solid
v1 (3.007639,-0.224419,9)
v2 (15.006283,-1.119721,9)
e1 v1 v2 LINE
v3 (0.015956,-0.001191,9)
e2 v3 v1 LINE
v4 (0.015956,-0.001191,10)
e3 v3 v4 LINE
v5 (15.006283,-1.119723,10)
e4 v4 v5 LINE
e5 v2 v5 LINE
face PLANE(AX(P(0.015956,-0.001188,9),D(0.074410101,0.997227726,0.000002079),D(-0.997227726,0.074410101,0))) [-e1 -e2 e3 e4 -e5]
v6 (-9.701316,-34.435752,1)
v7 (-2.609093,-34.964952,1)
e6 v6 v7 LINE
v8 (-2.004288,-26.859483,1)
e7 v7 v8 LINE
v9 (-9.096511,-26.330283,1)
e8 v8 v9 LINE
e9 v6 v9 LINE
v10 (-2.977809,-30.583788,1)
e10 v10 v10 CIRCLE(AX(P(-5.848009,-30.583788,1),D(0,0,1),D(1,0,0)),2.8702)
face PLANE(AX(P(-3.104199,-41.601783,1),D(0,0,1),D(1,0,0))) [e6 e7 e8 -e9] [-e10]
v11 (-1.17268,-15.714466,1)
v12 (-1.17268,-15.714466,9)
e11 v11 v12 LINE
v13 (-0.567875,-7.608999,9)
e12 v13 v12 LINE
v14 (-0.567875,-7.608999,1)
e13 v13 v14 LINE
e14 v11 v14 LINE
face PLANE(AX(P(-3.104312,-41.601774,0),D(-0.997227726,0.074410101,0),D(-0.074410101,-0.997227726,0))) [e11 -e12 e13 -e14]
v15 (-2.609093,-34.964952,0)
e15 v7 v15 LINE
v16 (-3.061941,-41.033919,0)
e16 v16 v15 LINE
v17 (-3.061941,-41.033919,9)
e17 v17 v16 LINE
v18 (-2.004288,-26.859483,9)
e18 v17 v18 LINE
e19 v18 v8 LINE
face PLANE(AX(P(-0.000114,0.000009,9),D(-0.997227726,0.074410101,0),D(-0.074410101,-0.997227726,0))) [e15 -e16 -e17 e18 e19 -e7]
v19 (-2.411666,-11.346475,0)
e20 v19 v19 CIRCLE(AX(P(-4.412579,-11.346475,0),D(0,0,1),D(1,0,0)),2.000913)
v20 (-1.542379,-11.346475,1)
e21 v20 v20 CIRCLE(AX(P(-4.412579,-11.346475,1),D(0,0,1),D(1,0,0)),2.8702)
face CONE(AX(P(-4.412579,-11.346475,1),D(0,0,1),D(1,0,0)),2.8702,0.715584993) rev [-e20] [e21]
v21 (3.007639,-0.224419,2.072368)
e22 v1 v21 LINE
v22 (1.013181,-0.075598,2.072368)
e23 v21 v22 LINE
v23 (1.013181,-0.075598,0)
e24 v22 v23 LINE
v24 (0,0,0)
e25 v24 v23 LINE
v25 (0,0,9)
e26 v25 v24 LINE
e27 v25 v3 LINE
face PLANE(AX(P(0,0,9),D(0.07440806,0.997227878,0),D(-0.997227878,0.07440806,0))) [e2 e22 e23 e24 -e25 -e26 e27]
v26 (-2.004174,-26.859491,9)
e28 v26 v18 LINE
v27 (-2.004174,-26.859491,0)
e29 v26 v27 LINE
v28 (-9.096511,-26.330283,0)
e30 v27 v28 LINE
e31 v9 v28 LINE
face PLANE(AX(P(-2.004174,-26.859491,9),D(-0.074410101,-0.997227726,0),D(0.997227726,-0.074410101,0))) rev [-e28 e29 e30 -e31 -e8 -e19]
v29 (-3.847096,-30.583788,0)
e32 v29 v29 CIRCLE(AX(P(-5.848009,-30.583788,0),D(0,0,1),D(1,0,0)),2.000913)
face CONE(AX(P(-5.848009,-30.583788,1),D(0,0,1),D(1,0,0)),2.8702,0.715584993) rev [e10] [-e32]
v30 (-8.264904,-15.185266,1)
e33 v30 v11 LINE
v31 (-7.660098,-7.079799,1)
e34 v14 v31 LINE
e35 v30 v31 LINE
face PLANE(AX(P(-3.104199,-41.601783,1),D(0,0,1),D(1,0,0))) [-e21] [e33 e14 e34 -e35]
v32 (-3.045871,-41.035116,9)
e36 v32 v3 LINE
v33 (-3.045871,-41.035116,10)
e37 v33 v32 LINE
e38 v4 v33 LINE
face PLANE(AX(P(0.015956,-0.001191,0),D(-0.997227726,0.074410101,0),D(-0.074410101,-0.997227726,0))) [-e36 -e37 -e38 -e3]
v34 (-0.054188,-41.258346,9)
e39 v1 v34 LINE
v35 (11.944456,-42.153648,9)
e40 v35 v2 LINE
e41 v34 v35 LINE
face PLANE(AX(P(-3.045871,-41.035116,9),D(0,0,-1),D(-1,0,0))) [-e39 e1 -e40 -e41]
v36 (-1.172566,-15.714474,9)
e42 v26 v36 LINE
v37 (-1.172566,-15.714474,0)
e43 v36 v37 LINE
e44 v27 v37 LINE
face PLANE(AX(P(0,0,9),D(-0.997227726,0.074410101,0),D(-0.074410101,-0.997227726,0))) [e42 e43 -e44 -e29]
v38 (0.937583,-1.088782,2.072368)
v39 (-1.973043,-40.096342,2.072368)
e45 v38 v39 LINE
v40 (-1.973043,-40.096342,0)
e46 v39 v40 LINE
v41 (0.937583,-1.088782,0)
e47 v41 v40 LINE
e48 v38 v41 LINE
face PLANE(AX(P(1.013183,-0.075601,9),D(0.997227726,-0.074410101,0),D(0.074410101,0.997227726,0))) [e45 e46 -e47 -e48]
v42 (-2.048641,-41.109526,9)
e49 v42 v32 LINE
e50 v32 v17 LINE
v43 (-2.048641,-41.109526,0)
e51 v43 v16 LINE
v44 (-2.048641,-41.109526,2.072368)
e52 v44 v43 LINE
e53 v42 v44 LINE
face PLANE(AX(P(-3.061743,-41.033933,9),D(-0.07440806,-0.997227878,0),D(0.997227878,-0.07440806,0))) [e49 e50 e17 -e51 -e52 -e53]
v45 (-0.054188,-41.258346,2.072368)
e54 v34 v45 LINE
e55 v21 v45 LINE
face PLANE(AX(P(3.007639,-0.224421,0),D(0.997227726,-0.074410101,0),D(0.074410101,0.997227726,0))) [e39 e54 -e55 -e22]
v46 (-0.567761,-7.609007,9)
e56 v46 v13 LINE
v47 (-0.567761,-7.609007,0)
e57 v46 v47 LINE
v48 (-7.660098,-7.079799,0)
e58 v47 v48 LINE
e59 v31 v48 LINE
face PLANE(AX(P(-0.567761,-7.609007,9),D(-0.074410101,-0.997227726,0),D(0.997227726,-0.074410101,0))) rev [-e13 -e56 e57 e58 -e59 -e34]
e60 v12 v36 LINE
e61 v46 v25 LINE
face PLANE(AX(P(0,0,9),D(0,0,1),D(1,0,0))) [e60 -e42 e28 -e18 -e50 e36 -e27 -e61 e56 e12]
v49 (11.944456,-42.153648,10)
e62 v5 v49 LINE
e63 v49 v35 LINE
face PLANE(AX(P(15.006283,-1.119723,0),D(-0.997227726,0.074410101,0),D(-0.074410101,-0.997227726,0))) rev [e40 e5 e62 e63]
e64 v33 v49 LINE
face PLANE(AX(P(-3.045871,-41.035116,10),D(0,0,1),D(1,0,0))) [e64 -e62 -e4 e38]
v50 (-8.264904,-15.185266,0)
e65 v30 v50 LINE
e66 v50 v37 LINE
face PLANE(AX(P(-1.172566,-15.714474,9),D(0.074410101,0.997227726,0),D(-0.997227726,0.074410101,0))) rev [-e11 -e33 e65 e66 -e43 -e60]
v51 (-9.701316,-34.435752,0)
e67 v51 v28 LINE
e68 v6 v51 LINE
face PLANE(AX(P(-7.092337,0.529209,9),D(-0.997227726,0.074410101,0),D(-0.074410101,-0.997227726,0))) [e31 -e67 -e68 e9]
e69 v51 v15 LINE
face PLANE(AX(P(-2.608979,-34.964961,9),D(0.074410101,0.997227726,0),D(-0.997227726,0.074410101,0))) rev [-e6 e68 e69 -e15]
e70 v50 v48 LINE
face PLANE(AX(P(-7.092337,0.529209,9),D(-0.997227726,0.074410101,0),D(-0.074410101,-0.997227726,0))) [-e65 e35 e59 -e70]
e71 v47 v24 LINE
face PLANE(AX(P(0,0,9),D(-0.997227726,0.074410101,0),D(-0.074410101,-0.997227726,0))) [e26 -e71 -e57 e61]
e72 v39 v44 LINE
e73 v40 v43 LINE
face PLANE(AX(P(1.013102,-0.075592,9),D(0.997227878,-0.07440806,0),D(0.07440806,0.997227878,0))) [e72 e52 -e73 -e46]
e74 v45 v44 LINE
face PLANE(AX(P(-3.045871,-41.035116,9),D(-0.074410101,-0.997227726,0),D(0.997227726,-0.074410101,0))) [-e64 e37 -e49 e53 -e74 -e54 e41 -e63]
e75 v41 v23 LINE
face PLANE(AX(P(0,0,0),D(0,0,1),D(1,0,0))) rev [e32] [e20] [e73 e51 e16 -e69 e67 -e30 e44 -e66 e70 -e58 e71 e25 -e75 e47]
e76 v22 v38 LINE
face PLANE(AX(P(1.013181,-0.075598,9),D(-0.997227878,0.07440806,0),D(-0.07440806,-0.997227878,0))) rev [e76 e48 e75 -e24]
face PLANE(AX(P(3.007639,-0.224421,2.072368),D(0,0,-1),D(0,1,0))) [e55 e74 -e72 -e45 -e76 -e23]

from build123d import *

# Parameters (mm, degrees)
BOSS_EXTRUDE2_DEPTH                           = 9
CUT_EXTRUDE3_DEPTH                            = 37.794697197
CUT_EXTRUDE3_DEPTH_BACK                       = 29.526
SKETCH3_W                                     = 54.22029704
SKETCH3_H                                     = 8
BOSS_EXTRUDE3_DEPTH                           = 14.032
BOSS_EXTRUDE3_DEPTH_BACK                      = 1
BOSS_EXTRUDE4_DEPTH                           = 2
CSK_FOR_3_FLAT_HEAD_SOCKET_CAP_SCREW1_A_COUNT = 2
CSK_FOR_3_FLAT_HEAD_SOCKET_CAP_SCREW1_A_PITCH = 19.290792


with BuildPart() as part:
    # Sketch2 → Boss-Extrude2 (new body)
    with BuildSketch(Plane.XY):
        Polygon((-9.096510891, -26.330282843), (-9.701316376, -34.435752293), (-2.609093023, -34.964952435), (-3.061940834, -41.033918716), (-2.048641284, -41.109525962), (-1.973042695, -40.096342438), (0.937582862, -1.088781958), (1.013181451, -0.075598434), (0, 0), (-0.567761002, -7.60900747), (-7.660098307, -7.079798826), (-8.264903605, -15.18526578), (-1.1725663, -15.714474425), (-2.004173586, -26.859491487), align=None)
    extrude(amount=BOSS_EXTRUDE2_DEPTH)

    # Sketch3 → Cut-Extrude3 (cut, two sides: drawn at the far end of the back side and taken through both)
    with BuildSketch(Plane(origin=(-2.608979071, -34.964960937, 0), x_dir=(0.9972277257028987, -0.07441010072177218, 0), z_dir=(-0.07441010072177218, -0.9972277257028987, 0)).offset(-CUT_EXTRUDE3_DEPTH_BACK)):
        with Locations((-27.110262789, 5)):
            Rectangle(SKETCH3_W, SKETCH3_H)
    extrude(amount=CUT_EXTRUDE3_DEPTH + CUT_EXTRUDE3_DEPTH_BACK, mode=Mode.SUBTRACT)

    # Sketch4 → Boss-Extrude3 (add, two sides: drawn at the far end of the back side and taken through both)
    with BuildSketch(Plane(origin=(1.013183369, -0.075600662, 0), x_dir=(0, 0, -1), z_dir=(0.9972277257028997, -0.07441010072175744, 0)).offset(-BOSS_EXTRUDE3_DEPTH_BACK)):
        Polygon((-9, -41.147998684), (-9, 2.079e-06), (-10, 0), (-10, -41.147998684), align=None)
    extrude(amount=BOSS_EXTRUDE3_DEPTH + BOSS_EXTRUDE3_DEPTH_BACK)


with BuildPart() as boss_extrude4_tool:
    # Sketch5 → Boss-Extrude4 (new body)
    with BuildSketch(Plane(origin=(1.013183369, -0.075600662, 0), x_dir=(0, 0, -1), z_dir=(0.9972277257028997, -0.07441010072175744, 0))):
        Polygon((-2.072367721, 0), (-9, 2.079e-06), (-9, -41.147998684), (-2.072367721, -41.147998684), align=None)
    extrude(amount=BOSS_EXTRUDE4_DEPTH)


with BuildPart() as part_1:
    add(part.part)


with BuildPart() as part_2:
    # Boss-Extrude4: joined with boss_extrude4_tool
    add(part_1.part.fuse(boss_extrude4_tool.part, tol=0.00001))

    # Sketch6 → CSK for #3 Flat Head Socket Cap Screw1 (revolve, cut)
    with BuildSketch(Plane(origin=(-4.41257913, -11.346475453, 1), x_dir=(0, -1, 0), z_dir=(1, 0, 0))):
        Polygon((0, 0), (0, 1), (1.397, 1), (1.397, 1.694722738), (2.8702, 0), align=None)
    csk_for_3_flat_head_socket_cap_screw1 = revolve(axis=Axis((-4.41257913, -11.346475453, 7.35), (0, 0, -1)), mode=Mode.SUBTRACT)

    # CSK for #3 Flat Head Socket Cap Screw1 a: CSK for #3 Flat Head Socket Cap Screw1 ×2
    with Locations(*[Vector(-0.07441010072177331, -0.9972277257028986, 0) * (i * CSK_FOR_3_FLAT_HEAD_SOCKET_CAP_SCREW1_A_PITCH) for i in range(1, CSK_FOR_3_FLAT_HEAD_SOCKET_CAP_SCREW1_A_COUNT)]):
        add(csk_for_3_flat_head_socket_cap_screw1, mode=Mode.SUBTRACT)


solid = part_2.part
